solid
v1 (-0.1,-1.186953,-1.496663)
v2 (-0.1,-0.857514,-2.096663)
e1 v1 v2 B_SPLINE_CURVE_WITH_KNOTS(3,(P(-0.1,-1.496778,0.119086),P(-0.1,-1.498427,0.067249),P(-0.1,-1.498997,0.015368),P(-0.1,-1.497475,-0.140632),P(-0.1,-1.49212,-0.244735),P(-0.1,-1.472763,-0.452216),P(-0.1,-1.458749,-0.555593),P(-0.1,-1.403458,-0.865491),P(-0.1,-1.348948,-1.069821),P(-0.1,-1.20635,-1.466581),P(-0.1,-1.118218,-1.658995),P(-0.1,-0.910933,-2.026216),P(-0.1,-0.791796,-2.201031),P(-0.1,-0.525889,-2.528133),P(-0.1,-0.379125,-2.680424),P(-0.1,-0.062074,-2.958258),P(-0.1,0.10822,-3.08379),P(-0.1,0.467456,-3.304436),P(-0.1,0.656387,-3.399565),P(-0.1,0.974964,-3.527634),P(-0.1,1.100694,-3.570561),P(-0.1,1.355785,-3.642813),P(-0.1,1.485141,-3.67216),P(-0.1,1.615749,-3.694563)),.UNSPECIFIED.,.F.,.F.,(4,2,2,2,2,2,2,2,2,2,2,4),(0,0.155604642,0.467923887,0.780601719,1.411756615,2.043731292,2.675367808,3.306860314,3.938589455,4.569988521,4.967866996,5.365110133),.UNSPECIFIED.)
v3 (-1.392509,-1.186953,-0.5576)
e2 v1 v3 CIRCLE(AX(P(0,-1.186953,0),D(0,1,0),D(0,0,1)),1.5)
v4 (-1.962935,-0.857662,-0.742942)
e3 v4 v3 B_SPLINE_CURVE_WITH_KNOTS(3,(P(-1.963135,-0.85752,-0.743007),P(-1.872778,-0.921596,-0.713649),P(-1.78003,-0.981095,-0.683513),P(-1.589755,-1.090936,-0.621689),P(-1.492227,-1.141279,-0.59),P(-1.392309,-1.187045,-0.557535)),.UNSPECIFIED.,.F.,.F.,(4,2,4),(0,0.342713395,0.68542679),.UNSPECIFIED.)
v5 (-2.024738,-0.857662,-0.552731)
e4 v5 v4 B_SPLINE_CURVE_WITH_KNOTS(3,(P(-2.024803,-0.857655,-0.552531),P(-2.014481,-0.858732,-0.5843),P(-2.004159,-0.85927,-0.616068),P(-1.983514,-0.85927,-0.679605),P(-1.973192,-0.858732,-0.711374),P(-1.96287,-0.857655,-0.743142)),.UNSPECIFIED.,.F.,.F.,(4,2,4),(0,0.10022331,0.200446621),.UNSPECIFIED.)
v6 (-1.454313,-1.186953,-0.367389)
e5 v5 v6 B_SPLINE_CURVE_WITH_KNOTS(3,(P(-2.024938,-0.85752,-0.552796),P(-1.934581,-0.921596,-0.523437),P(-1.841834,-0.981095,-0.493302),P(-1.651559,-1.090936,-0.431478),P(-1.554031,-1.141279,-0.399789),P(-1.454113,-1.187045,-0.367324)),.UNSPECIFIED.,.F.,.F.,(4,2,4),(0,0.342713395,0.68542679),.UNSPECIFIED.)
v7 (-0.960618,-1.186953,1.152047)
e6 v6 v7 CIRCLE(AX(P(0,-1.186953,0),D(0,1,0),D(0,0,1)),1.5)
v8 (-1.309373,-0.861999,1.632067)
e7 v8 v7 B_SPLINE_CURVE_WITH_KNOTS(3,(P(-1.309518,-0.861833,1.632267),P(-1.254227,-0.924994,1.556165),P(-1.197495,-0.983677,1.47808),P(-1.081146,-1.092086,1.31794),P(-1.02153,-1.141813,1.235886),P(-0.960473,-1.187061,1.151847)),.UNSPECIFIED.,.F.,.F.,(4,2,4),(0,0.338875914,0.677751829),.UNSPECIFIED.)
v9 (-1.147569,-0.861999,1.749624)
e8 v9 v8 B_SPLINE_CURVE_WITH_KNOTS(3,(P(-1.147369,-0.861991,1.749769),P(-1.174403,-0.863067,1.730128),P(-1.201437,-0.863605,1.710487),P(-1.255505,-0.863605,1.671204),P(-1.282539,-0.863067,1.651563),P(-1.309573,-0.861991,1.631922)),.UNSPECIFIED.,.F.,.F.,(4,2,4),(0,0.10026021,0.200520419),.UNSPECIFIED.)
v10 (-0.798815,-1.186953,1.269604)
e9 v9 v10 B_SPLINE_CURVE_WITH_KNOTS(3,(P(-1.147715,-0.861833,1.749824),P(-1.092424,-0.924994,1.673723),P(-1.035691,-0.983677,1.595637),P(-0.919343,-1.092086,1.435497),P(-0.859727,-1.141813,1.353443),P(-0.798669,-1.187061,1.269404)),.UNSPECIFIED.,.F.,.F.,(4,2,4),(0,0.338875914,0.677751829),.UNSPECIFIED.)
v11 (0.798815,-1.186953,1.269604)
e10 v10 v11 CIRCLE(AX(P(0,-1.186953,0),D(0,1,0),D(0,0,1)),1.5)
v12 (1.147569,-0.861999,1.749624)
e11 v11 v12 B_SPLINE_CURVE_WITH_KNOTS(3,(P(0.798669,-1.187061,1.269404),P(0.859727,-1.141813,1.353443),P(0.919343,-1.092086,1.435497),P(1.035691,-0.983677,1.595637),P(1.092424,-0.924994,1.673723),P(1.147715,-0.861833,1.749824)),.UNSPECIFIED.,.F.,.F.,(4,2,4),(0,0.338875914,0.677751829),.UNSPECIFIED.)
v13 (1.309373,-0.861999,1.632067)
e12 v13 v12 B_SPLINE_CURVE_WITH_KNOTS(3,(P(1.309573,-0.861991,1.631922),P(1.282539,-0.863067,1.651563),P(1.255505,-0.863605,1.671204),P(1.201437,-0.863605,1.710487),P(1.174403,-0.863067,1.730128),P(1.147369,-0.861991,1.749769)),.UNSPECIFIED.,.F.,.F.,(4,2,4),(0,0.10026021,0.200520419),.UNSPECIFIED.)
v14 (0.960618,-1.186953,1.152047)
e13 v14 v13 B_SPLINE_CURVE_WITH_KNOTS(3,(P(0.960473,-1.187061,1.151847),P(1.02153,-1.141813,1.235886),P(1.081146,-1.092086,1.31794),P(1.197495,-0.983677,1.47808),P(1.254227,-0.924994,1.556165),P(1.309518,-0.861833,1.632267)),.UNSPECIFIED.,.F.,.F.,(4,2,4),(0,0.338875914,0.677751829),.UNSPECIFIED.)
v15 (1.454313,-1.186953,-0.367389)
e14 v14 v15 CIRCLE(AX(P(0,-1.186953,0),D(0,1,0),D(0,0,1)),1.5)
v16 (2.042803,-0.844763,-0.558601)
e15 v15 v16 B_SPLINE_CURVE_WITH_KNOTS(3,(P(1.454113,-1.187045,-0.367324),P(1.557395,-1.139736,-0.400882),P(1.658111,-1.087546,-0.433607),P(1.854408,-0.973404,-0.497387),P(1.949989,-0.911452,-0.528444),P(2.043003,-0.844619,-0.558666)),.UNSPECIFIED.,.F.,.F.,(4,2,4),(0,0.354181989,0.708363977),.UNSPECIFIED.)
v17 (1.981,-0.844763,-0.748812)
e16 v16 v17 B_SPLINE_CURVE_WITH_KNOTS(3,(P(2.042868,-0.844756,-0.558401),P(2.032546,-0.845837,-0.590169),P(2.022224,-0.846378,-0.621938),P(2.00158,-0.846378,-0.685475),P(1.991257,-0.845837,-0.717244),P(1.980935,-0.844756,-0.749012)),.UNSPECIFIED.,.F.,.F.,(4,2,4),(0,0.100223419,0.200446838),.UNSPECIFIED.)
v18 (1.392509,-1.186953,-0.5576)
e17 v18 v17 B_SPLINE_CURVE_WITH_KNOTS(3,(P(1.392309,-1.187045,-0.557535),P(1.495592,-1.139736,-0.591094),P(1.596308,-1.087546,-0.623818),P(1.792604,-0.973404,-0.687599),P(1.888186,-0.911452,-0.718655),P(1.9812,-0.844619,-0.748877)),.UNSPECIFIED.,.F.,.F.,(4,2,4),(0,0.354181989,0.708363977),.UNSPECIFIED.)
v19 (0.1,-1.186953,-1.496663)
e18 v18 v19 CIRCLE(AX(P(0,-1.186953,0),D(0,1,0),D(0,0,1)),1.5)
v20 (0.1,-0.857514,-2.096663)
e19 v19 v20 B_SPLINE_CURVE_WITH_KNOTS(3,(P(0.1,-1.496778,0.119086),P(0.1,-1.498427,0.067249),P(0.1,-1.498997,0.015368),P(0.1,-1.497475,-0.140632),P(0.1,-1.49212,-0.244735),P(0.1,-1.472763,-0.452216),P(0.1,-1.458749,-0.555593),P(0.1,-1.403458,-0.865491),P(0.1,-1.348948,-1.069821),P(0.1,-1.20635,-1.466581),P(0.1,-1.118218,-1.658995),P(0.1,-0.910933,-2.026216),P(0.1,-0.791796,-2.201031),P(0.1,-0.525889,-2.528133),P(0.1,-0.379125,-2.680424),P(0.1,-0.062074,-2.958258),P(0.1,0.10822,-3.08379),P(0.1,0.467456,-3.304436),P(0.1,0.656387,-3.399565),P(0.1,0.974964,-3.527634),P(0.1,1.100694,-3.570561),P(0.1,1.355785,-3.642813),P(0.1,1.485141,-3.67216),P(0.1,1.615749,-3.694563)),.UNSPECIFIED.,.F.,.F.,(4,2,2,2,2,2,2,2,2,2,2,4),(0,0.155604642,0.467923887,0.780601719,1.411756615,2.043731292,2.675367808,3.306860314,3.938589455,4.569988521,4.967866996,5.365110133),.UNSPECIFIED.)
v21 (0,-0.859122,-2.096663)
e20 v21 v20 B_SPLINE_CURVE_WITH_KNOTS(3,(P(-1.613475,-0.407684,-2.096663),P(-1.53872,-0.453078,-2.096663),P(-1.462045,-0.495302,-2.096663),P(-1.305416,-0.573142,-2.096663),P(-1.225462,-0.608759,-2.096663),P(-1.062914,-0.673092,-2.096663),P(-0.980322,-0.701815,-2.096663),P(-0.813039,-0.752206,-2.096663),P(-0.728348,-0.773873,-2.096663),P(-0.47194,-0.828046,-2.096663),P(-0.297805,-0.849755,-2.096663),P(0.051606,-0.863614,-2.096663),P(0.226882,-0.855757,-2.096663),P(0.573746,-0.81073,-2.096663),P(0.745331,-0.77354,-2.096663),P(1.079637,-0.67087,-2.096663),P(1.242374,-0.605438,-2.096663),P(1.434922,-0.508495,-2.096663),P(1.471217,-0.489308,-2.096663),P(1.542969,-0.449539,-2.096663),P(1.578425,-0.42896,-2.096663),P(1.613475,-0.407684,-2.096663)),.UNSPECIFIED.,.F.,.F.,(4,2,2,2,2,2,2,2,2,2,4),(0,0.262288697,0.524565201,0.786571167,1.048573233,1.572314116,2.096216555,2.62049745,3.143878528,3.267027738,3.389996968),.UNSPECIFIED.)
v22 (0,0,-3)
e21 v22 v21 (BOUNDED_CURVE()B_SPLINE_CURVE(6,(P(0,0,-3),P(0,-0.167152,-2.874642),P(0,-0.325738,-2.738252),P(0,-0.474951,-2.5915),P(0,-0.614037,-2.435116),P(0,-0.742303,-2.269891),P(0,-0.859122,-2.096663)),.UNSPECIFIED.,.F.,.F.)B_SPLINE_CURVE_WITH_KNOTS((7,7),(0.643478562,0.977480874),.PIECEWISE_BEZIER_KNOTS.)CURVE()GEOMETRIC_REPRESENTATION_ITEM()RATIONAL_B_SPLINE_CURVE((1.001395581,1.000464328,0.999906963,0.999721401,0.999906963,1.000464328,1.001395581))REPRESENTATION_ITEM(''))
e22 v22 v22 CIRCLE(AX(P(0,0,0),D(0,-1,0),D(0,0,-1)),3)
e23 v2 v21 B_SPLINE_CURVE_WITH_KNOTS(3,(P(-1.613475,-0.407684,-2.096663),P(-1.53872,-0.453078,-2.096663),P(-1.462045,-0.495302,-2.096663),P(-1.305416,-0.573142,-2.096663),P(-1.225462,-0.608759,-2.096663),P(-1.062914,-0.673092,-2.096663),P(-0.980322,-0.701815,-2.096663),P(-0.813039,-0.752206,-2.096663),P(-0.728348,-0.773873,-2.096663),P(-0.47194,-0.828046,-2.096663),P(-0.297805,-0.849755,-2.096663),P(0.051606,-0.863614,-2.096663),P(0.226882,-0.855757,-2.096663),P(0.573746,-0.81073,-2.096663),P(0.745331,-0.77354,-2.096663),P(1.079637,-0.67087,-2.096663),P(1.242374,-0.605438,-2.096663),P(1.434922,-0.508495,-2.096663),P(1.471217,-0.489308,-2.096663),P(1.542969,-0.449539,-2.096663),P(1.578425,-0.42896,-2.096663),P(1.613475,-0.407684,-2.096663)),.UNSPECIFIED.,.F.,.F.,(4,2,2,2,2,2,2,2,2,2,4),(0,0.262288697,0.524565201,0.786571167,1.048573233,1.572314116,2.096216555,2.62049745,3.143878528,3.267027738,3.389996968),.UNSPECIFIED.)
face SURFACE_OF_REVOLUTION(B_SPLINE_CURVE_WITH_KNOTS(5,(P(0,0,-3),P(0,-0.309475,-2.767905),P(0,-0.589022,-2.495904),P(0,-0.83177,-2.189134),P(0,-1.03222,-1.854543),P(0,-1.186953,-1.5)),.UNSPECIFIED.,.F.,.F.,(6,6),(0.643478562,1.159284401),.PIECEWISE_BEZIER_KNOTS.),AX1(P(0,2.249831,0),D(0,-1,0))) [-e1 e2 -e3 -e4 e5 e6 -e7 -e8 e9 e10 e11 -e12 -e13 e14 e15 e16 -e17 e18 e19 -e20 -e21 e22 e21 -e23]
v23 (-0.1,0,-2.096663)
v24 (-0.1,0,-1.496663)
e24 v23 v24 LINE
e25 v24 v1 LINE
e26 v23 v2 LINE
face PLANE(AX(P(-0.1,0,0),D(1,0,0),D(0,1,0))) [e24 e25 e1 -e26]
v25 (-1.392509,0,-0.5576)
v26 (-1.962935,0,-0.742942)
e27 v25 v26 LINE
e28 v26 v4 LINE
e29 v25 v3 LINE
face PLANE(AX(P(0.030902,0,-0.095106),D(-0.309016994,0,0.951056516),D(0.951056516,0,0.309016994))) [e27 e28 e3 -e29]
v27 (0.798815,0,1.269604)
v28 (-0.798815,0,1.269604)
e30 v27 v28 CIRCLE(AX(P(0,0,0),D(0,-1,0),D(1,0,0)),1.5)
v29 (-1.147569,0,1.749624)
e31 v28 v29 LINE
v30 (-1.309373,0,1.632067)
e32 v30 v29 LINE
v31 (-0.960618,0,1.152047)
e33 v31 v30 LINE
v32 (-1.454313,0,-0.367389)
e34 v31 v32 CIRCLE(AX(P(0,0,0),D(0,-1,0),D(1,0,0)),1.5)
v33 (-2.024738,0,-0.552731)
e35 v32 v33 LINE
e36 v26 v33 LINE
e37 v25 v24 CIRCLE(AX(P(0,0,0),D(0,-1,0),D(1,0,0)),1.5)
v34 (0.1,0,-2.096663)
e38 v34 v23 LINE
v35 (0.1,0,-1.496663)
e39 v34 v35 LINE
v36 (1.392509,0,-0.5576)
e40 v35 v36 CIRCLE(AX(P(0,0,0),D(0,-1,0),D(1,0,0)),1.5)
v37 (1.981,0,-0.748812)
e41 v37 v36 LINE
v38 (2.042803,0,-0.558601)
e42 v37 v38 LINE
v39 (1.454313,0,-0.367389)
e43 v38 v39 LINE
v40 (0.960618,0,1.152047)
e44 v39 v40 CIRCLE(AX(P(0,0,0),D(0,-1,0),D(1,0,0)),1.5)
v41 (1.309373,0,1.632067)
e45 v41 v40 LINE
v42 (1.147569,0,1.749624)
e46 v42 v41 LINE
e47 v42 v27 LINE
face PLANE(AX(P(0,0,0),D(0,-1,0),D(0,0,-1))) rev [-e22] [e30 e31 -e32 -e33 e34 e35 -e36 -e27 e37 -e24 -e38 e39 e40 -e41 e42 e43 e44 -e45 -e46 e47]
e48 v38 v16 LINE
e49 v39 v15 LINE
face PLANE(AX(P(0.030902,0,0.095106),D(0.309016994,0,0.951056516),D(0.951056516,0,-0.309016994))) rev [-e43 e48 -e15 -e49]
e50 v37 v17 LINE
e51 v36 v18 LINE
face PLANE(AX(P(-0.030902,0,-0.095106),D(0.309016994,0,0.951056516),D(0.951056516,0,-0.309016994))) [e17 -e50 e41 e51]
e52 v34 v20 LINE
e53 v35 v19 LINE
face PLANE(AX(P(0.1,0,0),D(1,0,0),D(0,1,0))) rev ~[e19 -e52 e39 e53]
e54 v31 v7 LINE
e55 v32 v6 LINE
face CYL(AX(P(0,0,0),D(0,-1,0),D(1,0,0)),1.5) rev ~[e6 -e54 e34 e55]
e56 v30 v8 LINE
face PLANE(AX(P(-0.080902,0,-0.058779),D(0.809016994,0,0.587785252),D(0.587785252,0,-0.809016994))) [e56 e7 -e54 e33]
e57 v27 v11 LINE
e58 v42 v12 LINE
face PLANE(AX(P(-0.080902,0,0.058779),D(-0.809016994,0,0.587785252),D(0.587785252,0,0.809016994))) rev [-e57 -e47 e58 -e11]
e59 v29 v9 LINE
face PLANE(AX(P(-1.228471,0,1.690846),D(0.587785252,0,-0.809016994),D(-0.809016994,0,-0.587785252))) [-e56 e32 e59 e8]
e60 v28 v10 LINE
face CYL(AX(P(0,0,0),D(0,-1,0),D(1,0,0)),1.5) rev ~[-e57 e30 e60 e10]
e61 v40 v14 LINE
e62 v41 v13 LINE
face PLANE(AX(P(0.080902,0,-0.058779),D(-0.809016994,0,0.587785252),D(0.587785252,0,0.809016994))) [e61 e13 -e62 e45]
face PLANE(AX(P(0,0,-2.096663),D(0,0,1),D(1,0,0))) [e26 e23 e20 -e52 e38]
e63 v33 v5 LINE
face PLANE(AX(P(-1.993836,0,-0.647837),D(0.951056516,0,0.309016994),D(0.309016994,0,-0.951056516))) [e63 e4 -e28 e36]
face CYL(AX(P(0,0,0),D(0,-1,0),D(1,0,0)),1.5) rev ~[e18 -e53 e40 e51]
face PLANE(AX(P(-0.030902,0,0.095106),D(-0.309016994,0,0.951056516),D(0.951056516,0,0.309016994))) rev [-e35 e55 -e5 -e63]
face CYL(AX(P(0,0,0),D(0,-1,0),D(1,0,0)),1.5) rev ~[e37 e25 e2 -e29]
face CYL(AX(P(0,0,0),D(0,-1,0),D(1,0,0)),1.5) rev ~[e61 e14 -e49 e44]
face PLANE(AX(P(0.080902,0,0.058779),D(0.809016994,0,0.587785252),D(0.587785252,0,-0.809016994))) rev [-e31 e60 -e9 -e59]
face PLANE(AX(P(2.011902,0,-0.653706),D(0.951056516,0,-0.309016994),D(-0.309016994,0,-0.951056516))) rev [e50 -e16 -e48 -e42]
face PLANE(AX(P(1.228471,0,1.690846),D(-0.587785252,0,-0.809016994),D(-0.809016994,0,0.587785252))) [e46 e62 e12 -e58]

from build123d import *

# Parameters (mm, degrees)
TAGLIO_ESTRUSIONE3_DEPTH = 5.500000167


with BuildPart() as part:
    # Schizzo2 → Rivoluzione2 (revolve)
    with BuildSketch(Plane.XY):
        with BuildLine():
            Line((3, 0), (0, 0))
            Line((0, 0), (0, -1.5))
            ThreePointArc((0, -1.5), (1.677059909, -1.104119819), (3, 0))
        make_face()
    revolve(axis=Axis((0, -1.5, 0), (0, 1, 0)))

    # Schizzo3 → Taglio-Estrusione3 (cut, through all)
    with BuildSketch(Plane(origin=(0, -1.5, 0), x_dir=(-1, 0, 0), z_dir=(0, -1, 0))):
        with BuildLine():
            Line((0.1, 2.096662955), (-0.1, 2.096662955))
            Line((-0.1, 2.096662955), (-0.1, 1.496662955))
            ThreePointArc((-0.1, 1.496662955), (-0.881677878, 1.213525492), (-1.392509356, 0.557599939))
            Line((-1.392509356, 0.557599939), (-1.98100003, 0.74881215))
            Line((-1.98100003, 0.74881215), (-2.042803429, 0.558600847))
            Line((-2.042803429, 0.558600847), (-1.454312755, 0.367388636))
            ThreePointArc((-1.454312755, 0.367388636), (-1.426584774, -0.463525492), (-0.960618112, -1.15204724))
            Line((-0.960618112, -1.15204724), (-1.309372877, -1.632066993))
            Line((-1.309372877, -1.632066993), (-1.147569478, -1.749624043))
            Line((-1.147569478, -1.749624043), (-0.798814713, -1.26960429))
            ThreePointArc((-0.798814713, -1.26960429), (0, -1.5), (0.798814713, -1.26960429))
            Line((0.798814713, -1.26960429), (1.147569478, -1.749624043))
            Line((1.147569478, -1.749624043), (1.309372877, -1.632066993))
            Line((1.309372877, -1.632066993), (0.960618112, -1.15204724))
            ThreePointArc((0.960618112, -1.15204724), (1.426584774, -0.463525492), (1.454312755, 0.367388636))
            Line((1.454312755, 0.367388636), (2.024738008, 0.552731036))
            Line((2.024738008, 0.552731036), (1.962934609, 0.742942339))
            Line((1.962934609, 0.742942339), (1.392509356, 0.557599939))
            ThreePointArc((1.392509356, 0.557599939), (0.881677878, 1.213525492), (0.1, 1.496662955))
            Line((0.1, 1.496662955), (0.1, 2.096662955))
        make_face()
    extrude(amount=-TAGLIO_ESTRUSIONE3_DEPTH, mode=Mode.SUBTRACT)


solid = part.part
